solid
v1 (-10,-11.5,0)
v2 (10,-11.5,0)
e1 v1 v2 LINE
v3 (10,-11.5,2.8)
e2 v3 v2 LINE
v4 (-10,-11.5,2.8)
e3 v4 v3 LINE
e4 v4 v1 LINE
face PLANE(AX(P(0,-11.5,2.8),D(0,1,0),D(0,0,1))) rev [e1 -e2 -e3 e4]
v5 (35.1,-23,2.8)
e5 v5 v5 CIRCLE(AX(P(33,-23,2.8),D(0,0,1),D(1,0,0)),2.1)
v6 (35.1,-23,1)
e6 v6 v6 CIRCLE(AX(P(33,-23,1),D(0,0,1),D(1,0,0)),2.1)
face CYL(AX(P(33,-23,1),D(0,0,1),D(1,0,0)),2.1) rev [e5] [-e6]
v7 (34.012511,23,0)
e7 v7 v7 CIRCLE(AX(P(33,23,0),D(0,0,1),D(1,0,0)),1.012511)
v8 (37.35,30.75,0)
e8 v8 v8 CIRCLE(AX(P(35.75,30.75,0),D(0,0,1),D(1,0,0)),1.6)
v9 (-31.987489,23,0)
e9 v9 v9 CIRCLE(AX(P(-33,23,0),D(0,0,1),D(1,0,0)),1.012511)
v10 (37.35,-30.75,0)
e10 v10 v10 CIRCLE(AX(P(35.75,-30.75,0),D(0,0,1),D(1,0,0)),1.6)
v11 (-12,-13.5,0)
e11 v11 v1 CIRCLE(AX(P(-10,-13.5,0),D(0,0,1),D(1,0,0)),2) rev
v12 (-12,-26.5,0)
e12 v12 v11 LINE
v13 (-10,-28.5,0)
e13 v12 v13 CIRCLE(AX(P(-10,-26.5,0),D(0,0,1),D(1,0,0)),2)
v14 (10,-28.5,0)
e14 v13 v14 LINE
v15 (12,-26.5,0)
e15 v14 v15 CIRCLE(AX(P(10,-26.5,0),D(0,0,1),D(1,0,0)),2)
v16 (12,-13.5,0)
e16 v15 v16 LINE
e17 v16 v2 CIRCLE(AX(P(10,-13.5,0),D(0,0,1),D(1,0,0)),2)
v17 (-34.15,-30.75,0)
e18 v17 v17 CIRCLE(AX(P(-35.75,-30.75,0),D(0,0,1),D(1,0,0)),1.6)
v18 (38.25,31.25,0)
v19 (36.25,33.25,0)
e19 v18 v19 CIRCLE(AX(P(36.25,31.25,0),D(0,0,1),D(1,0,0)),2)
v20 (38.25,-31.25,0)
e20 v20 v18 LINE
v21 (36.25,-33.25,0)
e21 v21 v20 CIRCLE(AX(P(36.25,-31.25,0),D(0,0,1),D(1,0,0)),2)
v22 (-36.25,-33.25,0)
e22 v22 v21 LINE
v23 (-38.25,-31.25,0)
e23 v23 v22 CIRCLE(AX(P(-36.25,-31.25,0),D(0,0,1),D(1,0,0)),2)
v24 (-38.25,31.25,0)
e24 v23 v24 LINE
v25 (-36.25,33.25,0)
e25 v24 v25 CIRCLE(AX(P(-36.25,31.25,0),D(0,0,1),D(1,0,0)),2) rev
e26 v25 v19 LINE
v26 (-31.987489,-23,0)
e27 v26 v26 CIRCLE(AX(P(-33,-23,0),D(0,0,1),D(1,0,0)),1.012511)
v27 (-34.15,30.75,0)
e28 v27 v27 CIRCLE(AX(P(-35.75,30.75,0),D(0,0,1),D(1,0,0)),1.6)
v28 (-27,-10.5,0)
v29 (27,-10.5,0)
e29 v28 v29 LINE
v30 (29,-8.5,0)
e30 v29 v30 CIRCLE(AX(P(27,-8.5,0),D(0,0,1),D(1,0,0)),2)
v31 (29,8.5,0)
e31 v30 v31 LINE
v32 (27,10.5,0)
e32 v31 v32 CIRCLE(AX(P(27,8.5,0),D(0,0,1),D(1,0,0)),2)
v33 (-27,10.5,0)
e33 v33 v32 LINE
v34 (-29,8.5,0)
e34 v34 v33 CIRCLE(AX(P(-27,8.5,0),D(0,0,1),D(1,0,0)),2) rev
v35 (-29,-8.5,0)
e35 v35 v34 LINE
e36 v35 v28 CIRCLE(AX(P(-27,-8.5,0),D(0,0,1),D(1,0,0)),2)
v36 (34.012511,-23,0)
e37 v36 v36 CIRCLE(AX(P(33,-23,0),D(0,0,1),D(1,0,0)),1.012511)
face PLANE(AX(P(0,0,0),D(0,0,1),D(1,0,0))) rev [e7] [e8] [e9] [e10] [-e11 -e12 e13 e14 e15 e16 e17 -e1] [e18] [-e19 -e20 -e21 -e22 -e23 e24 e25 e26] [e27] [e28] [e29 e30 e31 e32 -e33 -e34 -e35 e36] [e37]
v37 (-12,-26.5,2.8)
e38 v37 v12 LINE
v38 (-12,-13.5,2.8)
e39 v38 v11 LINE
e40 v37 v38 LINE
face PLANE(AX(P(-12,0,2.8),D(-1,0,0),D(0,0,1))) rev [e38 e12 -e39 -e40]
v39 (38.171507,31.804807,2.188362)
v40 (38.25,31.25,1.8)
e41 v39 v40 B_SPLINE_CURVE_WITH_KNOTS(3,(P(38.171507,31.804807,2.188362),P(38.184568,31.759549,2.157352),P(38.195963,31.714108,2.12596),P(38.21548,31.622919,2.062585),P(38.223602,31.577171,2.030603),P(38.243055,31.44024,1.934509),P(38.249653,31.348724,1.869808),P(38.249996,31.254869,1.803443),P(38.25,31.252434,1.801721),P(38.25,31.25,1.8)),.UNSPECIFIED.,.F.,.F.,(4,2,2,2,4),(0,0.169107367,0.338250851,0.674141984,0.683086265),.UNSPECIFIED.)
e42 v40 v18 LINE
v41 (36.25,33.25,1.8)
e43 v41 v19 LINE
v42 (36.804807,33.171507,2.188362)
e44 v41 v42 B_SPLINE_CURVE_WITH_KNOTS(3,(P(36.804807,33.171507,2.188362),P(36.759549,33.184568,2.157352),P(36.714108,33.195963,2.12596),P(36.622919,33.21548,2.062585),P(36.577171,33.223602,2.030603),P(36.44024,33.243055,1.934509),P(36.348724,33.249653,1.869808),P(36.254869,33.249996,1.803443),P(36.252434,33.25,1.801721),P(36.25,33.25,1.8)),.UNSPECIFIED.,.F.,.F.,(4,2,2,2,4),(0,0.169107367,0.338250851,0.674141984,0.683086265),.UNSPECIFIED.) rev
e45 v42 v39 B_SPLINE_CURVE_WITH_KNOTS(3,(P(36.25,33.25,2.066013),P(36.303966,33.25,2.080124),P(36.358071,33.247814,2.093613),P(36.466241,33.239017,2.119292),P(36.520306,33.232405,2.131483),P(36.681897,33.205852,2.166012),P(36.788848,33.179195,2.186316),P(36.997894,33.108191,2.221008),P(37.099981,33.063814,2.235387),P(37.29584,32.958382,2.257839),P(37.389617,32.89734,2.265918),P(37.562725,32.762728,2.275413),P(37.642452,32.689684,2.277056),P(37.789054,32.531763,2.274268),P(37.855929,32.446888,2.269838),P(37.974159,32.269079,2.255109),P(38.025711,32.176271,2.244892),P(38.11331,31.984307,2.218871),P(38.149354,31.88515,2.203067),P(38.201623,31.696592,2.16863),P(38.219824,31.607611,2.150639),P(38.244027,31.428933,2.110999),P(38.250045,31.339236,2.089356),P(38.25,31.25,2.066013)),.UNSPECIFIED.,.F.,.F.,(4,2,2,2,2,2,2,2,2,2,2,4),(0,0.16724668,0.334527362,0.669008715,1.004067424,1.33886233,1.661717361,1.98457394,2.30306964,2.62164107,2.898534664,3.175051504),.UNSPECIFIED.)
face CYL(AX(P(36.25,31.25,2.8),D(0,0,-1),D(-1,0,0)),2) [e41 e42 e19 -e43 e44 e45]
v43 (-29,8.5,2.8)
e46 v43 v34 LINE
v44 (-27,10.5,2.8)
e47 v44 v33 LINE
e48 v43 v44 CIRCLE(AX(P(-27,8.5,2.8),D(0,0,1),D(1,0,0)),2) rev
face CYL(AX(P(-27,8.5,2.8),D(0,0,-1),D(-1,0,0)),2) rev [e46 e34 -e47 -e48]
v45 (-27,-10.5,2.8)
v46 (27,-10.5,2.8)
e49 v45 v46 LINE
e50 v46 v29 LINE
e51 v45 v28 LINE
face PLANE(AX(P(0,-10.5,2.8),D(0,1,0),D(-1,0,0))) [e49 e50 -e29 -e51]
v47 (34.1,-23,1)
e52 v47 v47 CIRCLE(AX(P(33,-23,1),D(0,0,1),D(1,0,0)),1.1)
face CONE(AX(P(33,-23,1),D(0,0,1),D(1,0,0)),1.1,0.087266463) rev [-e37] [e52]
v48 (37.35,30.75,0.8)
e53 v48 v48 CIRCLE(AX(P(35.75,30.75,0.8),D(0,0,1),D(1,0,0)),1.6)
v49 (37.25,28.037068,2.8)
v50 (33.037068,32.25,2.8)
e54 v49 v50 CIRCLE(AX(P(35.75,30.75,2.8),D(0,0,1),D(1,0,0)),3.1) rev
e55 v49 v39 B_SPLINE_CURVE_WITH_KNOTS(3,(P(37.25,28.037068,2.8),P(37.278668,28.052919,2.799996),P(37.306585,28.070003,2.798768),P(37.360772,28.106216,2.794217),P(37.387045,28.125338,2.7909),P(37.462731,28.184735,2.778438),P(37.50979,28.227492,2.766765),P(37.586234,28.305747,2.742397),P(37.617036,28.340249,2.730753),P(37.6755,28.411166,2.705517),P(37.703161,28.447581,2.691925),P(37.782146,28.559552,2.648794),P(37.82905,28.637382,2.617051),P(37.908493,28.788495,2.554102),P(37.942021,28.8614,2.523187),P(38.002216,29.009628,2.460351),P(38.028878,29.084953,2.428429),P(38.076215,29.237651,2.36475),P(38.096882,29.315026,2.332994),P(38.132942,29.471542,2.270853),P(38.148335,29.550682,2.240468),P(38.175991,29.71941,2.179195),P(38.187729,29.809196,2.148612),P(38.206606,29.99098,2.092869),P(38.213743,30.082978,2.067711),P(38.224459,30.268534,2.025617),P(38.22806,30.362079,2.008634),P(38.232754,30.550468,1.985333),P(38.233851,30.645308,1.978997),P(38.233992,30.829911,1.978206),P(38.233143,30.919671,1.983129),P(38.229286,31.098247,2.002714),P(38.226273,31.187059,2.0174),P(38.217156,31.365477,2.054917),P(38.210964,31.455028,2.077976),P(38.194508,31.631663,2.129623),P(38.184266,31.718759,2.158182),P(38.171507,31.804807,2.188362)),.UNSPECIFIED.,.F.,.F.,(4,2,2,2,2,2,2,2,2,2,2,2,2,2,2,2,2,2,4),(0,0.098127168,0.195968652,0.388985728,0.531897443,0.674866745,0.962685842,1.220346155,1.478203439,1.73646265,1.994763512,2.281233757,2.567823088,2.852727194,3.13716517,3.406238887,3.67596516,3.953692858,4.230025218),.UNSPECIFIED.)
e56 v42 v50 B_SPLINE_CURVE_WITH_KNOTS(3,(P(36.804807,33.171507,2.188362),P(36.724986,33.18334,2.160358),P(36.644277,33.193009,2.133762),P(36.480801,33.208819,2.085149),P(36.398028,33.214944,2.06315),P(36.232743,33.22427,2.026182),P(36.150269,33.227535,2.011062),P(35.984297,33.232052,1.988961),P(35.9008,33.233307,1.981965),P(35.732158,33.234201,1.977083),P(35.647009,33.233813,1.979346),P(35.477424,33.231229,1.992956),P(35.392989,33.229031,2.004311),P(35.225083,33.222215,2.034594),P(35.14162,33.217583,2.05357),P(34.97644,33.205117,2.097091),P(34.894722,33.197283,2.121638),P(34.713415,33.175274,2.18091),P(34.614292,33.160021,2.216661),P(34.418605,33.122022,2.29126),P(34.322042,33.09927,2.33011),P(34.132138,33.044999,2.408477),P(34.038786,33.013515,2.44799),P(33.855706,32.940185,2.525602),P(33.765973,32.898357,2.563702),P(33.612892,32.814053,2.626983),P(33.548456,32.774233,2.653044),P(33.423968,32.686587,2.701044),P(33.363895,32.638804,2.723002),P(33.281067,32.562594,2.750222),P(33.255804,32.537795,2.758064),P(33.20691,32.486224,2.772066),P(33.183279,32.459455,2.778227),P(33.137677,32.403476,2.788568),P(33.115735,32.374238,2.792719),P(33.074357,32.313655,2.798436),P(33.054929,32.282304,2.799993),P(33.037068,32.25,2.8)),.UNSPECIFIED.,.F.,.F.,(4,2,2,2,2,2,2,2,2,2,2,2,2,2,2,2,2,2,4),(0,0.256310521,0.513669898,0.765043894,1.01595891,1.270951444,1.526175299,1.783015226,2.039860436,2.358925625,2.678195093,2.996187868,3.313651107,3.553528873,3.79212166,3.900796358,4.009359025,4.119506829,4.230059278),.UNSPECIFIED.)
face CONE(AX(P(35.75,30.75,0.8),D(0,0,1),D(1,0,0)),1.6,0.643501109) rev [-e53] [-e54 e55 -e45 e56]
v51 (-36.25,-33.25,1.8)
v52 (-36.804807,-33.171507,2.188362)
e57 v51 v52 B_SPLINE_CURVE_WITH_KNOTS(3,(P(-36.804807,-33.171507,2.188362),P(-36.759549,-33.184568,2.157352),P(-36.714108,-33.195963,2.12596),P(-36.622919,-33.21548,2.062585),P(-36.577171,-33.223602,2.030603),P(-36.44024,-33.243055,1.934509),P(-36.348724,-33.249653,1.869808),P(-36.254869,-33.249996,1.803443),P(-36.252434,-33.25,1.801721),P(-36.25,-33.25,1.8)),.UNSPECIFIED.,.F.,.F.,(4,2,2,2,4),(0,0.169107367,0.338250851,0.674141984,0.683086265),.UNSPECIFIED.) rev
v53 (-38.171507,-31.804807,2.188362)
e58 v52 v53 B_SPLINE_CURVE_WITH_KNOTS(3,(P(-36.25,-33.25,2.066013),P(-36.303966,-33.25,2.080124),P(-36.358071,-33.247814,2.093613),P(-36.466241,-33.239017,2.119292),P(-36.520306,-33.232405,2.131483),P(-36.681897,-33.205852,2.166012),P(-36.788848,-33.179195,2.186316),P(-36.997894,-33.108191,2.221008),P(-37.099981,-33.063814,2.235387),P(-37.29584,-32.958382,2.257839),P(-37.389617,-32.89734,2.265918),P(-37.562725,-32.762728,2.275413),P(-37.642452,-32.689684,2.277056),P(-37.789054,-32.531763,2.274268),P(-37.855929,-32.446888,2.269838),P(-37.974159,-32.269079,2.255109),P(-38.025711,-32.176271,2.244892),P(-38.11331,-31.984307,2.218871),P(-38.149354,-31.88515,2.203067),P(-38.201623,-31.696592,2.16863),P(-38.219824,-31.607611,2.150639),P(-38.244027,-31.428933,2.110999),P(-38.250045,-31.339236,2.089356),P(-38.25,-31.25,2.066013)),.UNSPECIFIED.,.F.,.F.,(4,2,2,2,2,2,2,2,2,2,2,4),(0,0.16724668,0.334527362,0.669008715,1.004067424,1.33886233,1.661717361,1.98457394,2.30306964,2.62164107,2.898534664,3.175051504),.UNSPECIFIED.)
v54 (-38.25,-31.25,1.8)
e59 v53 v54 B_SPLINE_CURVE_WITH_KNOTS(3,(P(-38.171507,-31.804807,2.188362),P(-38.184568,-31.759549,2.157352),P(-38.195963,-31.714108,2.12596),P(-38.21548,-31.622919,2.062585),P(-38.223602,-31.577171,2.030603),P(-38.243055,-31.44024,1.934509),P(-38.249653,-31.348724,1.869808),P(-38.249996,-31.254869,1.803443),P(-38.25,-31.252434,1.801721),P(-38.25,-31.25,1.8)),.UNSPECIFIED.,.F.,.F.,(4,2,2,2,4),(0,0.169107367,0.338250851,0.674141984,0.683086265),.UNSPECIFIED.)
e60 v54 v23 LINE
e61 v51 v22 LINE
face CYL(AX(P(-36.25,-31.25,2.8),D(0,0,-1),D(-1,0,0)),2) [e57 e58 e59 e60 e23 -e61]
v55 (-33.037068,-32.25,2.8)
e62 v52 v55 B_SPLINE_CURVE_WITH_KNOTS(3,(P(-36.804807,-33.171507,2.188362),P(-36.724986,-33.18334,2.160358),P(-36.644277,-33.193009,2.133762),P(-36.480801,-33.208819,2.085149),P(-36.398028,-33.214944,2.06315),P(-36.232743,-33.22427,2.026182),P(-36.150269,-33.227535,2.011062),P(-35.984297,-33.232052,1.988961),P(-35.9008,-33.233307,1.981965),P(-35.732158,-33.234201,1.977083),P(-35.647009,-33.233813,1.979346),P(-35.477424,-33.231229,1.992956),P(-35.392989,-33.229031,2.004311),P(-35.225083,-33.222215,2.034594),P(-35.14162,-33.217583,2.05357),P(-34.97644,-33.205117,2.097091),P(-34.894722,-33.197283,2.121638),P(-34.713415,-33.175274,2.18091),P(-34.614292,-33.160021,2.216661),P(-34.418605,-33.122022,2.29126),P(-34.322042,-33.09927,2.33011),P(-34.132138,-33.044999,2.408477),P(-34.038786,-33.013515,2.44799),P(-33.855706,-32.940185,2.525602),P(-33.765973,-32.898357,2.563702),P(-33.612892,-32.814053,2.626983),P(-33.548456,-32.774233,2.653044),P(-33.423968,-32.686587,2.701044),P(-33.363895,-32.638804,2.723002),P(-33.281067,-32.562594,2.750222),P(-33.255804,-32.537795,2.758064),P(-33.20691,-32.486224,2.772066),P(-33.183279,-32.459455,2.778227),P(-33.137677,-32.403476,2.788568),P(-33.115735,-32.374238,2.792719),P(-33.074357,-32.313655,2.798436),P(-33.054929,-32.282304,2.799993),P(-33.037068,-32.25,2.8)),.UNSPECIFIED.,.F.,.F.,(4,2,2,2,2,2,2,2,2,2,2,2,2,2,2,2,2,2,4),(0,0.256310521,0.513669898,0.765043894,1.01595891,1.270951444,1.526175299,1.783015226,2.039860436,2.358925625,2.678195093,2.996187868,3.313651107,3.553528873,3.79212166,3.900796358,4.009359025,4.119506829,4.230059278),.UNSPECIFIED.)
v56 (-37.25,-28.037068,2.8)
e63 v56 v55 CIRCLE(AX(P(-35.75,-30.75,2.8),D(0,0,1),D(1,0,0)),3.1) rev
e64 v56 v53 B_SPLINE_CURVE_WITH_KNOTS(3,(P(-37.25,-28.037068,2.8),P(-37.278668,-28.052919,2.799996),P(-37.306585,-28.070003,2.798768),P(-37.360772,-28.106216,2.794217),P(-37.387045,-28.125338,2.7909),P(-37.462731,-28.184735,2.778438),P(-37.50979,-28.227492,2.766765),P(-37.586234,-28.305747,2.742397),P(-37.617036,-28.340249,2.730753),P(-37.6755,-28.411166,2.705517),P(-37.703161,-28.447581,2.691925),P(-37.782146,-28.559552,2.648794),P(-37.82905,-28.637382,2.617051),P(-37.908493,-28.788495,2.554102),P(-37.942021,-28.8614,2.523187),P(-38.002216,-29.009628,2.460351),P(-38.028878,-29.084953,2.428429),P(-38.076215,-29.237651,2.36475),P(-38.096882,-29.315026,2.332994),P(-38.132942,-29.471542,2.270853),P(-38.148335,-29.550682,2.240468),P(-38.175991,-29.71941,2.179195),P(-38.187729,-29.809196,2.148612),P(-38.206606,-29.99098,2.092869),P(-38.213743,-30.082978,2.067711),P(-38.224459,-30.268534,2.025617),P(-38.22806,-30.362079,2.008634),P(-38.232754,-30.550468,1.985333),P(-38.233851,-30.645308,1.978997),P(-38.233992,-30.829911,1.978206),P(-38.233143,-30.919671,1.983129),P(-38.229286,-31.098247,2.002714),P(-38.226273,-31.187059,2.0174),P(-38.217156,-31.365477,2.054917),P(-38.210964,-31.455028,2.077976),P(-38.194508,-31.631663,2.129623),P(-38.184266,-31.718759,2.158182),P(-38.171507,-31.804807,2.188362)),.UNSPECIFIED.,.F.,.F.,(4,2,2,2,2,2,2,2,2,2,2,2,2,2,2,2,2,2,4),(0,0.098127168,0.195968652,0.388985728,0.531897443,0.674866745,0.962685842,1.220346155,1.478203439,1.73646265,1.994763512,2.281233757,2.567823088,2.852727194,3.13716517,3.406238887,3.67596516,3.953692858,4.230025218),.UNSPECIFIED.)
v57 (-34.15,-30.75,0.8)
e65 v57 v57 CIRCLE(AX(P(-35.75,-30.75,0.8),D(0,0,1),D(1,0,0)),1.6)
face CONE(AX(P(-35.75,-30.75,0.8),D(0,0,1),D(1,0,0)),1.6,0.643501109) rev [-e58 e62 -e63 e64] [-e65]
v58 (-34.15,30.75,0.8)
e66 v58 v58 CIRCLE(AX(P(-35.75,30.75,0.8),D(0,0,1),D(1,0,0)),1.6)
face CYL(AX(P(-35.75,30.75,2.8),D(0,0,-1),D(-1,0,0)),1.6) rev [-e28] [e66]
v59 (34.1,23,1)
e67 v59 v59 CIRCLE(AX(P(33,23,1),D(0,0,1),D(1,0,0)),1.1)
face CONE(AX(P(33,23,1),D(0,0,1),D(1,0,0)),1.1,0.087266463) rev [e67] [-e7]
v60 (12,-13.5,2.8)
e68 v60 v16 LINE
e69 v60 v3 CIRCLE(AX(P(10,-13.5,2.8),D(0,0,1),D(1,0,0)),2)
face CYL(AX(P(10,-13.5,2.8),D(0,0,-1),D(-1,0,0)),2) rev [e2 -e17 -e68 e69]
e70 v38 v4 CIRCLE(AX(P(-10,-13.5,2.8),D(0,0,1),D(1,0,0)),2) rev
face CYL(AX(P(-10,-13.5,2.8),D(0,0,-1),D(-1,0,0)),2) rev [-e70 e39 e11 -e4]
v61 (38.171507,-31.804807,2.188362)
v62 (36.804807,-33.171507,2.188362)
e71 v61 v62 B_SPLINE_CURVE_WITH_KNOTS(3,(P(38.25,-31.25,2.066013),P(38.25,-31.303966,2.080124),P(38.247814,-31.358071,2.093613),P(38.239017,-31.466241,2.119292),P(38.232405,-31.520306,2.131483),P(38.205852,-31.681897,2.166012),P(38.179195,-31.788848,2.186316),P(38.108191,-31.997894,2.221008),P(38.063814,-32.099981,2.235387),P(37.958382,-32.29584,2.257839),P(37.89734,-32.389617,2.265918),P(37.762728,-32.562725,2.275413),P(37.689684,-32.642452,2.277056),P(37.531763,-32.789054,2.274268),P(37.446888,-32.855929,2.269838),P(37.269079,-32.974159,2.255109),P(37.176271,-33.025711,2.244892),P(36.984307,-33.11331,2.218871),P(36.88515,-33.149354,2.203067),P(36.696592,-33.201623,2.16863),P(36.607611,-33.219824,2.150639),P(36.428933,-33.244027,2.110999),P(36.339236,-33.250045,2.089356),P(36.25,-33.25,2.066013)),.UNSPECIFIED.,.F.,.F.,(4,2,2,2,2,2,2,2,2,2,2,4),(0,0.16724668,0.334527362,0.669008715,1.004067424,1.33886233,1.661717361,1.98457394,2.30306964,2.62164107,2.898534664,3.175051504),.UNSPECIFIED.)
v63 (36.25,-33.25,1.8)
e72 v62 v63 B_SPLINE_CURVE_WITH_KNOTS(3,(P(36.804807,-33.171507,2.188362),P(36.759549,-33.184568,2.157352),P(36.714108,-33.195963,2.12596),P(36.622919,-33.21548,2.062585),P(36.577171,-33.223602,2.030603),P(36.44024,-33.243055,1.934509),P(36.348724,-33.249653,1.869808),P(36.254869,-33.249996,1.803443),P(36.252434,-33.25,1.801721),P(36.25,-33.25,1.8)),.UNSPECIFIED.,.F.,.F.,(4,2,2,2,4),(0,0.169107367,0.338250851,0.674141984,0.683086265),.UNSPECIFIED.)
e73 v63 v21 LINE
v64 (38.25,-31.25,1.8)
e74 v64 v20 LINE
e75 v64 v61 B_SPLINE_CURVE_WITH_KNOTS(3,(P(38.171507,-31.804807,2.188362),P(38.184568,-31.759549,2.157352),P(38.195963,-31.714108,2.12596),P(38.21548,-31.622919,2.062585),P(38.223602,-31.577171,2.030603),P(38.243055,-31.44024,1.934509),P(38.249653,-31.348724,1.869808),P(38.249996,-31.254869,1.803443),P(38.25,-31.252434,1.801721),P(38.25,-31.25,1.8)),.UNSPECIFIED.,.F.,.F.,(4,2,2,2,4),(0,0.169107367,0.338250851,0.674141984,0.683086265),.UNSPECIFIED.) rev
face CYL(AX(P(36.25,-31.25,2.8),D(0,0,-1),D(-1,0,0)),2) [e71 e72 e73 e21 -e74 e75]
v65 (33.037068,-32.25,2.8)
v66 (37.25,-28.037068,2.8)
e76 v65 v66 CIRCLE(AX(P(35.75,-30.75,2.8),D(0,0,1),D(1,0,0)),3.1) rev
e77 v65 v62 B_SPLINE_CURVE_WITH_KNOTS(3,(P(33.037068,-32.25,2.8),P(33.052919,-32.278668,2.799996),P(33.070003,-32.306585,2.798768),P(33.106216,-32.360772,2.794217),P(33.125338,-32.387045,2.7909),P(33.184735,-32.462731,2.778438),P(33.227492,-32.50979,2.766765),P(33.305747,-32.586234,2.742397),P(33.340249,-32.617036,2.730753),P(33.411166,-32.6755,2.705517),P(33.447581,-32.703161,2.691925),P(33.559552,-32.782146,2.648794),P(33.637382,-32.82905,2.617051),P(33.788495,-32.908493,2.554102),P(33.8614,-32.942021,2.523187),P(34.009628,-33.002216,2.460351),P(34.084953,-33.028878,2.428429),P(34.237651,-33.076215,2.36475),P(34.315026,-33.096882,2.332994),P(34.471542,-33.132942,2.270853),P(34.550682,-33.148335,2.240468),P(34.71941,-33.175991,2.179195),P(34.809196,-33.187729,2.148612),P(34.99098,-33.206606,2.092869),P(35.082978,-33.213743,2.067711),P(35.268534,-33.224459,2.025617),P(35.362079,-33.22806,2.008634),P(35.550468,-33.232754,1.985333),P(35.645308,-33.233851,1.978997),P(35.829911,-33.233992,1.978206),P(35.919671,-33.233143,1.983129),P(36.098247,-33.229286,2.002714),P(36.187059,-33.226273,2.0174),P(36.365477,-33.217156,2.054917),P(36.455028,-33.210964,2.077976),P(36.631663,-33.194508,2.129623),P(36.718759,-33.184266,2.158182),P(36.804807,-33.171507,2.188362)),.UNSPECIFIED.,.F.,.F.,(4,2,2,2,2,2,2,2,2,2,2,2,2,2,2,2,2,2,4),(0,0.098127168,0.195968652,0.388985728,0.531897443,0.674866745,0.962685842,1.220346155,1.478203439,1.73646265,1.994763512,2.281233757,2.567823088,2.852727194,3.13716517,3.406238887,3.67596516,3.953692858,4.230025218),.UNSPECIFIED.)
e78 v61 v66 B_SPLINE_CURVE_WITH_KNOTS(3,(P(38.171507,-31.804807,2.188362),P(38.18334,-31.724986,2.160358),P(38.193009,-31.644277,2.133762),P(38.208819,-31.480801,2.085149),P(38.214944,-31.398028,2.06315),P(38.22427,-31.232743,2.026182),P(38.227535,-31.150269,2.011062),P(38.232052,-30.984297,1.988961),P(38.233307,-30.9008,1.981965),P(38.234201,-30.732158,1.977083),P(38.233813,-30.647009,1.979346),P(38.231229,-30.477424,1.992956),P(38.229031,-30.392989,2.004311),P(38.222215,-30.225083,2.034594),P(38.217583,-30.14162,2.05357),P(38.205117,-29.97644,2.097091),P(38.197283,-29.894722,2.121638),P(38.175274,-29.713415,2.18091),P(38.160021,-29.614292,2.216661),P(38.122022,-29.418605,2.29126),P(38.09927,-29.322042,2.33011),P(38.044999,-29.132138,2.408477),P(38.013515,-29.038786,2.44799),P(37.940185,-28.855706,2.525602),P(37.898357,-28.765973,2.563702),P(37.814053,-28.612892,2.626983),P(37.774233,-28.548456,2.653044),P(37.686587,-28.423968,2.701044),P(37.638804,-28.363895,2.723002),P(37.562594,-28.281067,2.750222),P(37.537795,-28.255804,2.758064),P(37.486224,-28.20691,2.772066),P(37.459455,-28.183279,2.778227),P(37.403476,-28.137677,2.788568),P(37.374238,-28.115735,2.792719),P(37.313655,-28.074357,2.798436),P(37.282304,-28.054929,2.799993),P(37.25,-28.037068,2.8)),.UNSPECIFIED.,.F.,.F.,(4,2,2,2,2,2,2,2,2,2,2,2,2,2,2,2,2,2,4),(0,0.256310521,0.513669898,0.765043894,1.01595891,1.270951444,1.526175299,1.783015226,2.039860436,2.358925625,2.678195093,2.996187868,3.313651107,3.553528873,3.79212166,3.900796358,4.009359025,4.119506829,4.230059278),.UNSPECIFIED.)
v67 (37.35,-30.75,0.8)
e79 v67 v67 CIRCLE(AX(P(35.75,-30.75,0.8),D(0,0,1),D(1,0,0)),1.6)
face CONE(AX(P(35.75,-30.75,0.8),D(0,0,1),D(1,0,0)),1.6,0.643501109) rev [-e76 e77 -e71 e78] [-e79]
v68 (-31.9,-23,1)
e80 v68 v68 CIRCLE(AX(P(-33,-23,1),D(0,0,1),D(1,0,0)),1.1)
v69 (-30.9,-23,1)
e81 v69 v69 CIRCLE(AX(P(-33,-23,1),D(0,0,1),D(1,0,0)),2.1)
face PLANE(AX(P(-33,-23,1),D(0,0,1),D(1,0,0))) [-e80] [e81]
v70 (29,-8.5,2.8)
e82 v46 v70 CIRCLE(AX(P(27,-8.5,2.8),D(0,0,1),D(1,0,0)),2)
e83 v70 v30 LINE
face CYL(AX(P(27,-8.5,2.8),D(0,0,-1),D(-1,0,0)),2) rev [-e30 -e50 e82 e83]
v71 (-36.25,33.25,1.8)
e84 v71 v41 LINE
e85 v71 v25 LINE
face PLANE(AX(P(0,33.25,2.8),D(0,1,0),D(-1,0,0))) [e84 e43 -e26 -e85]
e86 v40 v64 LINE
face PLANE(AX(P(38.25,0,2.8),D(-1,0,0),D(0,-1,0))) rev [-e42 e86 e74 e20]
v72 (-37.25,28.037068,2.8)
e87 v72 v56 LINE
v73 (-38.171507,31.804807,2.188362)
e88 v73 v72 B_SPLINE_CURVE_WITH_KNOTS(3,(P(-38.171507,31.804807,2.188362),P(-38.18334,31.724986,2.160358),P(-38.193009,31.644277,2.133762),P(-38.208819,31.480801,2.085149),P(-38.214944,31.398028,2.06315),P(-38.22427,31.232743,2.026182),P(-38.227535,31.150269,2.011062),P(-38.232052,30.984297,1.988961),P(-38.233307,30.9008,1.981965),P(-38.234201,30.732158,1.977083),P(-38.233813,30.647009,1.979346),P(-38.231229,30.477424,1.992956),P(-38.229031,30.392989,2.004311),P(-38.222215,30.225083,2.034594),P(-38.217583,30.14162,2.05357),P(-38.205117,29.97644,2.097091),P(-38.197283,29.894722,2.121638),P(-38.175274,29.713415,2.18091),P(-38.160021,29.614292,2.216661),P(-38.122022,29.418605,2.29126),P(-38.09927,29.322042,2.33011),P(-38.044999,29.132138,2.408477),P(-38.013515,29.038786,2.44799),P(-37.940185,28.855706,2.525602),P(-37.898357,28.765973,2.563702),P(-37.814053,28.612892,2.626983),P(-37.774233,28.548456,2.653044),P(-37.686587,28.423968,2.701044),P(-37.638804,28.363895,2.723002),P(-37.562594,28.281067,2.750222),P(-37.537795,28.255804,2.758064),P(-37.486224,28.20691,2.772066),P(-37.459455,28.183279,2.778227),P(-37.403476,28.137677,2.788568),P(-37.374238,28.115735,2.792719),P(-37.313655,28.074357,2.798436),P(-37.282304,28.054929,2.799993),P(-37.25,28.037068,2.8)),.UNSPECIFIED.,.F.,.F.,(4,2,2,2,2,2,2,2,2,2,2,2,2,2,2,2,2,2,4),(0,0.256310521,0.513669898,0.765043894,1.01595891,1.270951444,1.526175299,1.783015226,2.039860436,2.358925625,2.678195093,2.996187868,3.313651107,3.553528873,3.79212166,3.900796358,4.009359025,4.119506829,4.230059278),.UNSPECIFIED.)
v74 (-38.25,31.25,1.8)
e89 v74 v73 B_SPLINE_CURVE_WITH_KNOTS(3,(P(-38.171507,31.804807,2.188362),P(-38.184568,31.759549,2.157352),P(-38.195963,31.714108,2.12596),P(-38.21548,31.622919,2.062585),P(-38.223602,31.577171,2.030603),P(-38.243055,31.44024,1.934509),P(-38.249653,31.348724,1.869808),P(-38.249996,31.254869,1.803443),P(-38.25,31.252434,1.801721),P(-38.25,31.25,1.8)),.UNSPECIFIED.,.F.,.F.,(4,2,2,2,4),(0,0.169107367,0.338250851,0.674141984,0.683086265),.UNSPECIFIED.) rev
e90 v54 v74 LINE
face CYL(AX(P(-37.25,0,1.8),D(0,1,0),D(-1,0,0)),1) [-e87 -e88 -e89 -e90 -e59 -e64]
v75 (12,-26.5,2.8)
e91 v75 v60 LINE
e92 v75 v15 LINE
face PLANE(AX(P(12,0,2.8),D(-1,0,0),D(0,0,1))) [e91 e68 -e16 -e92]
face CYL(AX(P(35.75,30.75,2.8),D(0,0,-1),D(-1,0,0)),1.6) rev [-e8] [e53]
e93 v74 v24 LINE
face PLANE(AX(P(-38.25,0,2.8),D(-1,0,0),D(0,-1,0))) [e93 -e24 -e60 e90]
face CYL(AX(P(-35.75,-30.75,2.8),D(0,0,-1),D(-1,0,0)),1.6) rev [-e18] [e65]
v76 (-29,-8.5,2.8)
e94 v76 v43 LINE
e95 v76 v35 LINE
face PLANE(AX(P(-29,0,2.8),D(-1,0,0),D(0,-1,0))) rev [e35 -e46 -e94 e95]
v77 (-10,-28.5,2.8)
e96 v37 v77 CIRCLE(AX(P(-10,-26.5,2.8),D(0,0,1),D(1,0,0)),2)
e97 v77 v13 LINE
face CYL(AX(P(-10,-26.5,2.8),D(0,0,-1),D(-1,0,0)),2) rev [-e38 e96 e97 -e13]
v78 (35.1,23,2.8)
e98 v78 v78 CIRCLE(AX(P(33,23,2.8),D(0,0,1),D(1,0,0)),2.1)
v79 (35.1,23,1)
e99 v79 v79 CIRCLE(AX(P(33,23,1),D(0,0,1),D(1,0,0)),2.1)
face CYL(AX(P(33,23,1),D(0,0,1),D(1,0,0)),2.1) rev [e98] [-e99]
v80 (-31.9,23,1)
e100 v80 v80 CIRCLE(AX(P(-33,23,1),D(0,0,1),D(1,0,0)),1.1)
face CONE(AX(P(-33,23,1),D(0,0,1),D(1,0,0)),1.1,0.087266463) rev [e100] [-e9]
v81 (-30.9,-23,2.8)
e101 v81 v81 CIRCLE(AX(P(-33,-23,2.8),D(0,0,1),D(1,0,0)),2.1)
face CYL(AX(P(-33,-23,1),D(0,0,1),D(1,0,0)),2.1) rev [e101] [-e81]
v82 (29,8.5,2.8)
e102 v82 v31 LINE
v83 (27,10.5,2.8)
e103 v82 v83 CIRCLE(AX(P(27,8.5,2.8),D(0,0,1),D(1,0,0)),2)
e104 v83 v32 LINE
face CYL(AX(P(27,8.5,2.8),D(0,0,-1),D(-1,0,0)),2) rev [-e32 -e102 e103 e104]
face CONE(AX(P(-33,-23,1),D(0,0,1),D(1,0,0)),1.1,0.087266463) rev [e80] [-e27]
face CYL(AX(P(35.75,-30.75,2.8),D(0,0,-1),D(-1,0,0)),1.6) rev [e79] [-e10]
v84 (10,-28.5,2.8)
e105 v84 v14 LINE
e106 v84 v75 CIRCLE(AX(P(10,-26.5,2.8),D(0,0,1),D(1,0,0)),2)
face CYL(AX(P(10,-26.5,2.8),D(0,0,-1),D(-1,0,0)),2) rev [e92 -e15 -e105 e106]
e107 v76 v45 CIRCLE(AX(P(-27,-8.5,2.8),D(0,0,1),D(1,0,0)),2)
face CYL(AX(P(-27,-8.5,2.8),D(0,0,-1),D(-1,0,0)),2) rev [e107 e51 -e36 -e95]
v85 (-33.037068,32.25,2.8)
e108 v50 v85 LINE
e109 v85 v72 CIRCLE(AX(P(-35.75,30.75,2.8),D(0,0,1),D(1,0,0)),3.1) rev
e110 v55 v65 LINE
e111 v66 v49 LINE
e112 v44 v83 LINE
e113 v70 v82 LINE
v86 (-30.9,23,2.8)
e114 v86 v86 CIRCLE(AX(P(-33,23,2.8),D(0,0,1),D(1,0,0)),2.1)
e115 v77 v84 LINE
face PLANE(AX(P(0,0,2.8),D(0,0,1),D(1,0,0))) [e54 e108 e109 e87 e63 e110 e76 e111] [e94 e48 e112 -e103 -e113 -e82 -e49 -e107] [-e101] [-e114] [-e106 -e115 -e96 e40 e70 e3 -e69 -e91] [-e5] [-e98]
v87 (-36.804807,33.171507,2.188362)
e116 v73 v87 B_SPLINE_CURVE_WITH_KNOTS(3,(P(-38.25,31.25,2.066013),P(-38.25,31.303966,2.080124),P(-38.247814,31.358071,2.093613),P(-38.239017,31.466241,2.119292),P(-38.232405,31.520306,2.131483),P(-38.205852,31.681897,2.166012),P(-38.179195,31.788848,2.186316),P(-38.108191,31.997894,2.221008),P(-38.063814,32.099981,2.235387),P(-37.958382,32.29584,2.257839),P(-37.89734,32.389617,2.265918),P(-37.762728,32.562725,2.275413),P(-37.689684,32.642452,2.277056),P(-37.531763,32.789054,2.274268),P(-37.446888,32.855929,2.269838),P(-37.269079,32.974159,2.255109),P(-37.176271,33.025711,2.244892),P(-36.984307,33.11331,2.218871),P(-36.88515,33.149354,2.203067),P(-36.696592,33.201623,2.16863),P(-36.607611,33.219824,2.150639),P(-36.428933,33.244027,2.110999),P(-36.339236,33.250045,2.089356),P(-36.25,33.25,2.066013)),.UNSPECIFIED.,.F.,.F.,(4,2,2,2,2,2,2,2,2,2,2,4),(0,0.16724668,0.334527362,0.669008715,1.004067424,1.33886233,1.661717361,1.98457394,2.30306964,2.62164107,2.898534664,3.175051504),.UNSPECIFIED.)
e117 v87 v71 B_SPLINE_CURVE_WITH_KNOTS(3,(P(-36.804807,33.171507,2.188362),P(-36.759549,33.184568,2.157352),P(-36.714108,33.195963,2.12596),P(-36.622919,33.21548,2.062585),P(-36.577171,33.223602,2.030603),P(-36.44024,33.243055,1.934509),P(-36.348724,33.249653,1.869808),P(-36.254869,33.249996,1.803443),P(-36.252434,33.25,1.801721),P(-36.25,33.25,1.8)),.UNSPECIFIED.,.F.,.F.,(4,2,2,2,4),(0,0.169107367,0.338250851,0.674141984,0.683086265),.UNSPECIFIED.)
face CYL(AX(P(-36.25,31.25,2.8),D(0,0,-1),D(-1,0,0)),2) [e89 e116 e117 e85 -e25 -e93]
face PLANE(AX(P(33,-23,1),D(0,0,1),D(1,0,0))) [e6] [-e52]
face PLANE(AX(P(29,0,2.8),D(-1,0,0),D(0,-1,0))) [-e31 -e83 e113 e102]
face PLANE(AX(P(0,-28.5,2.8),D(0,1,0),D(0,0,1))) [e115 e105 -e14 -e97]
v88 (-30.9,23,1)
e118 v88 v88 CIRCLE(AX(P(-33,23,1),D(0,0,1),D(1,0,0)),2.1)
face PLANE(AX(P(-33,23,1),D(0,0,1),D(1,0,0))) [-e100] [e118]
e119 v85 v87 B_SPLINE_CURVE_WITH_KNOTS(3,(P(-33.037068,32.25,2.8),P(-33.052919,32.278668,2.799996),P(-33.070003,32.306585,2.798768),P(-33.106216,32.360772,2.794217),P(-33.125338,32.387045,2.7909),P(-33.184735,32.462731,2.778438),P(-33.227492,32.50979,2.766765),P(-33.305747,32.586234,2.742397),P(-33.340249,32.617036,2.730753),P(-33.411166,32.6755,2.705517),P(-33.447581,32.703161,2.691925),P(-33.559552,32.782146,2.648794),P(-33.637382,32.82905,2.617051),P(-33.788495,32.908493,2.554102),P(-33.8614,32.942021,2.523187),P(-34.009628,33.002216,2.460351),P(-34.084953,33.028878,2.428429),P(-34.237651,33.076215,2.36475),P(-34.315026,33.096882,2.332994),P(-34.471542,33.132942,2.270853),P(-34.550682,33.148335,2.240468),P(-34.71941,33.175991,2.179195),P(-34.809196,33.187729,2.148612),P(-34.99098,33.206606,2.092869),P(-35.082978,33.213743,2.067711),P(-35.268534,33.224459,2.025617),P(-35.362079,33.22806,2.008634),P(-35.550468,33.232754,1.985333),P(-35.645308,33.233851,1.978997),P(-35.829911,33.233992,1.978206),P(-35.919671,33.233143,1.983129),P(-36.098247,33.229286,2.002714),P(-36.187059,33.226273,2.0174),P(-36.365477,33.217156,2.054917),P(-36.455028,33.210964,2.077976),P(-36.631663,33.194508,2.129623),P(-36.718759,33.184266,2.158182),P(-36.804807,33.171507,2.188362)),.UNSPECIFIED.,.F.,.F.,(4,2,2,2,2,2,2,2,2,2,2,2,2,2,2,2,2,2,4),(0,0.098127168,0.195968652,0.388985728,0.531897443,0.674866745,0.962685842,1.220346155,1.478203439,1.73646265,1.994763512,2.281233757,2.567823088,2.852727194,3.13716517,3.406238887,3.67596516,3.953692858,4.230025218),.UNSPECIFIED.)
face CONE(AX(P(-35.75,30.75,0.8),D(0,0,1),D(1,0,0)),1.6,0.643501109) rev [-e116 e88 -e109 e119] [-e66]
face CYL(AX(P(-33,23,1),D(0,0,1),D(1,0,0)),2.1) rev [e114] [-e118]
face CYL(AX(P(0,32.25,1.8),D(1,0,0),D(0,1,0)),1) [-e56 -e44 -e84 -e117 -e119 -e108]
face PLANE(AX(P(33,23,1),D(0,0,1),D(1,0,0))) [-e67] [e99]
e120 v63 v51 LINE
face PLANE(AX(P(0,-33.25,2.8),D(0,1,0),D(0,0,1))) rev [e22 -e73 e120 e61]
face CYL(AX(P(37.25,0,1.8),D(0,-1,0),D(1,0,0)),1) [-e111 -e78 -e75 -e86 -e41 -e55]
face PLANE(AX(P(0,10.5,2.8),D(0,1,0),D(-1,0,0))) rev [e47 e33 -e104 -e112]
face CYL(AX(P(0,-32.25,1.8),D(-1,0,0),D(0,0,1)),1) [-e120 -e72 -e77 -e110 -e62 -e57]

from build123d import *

# Parameters (mm, degrees)
SKETCH1_R           = 1.6
BOSS_EXTRUDE1_DEPTH = 2.8
CUT_EXTRUDE2_START  = 2.8
SKETCH1_6_R         = 2.1
CUT_EXTRUDE2_DEPTH  = 1.8
CHAMFER1_SIZE       = 1.5
CHAMFER1_SIZE_2     = 2
FILLET1_START       = -33.224011807
FILLET1_DEPTH       = 66.448023614
FILLET1_START_2     = -38.224011807
FILLET1_2_DEPTH     = 76.3236742


with BuildPart() as part:
    # Sketch1 → Boss-Extrude1 (new body)
    with BuildSketch(Plane(origin=(0, 0, 0), x_dir=(0, 1, 0), z_dir=(0, 0, 1))):
        with BuildLine():
            Line((31.25, 38.25), (-31.25, 38.25))
            ThreePointArc((-31.25, 38.25), (-32.664213562, 37.664213562), (-33.25, 36.25))
            Line((-33.25, 36.25), (-33.25, -36.25))
            ThreePointArc((-33.25, -36.25), (-32.664213562, -37.664213562), (-31.25, -38.25))
            Line((-31.25, -38.25), (31.25, -38.25))
            ThreePointArc((31.25, -38.25), (32.664213562, -37.664213562), (33.25, -36.25))
            Line((33.25, -36.25), (33.25, 36.25))
            ThreePointArc((33.25, 36.25), (32.664213562, 37.664213562), (31.25, 38.25))
        make_face()
        with Locations(Location((-30.75, -35.75, 0), (0, 0, 270))):
            Circle(SKETCH1_R, mode=Mode.SUBTRACT)
        with Locations(Location((30.75, -35.75, 0), (0, 0, 270))):
            Circle(SKETCH1_R, mode=Mode.SUBTRACT)
        with BuildLine():
            ThreePointArc((-28.5, 10), (-27.914213562, 11.414213562), (-26.5, 12))
            Line((-26.5, 12), (-13.5, 12))
            ThreePointArc((-13.5, 12), (-12.085786438, 11.414213562), (-11.5, 10))
            Line((-11.5, 10), (-11.5, -10))
            ThreePointArc((-11.5, -10), (-12.085786438, -11.414213562), (-13.5, -12))
            Line((-13.5, -12), (-26.5, -12))
            ThreePointArc((-26.5, -12), (-27.914213562, -11.414213562), (-28.5, -10))
            Line((-28.5, -10), (-28.5, 10))
        make_face(mode=Mode.SUBTRACT)
        with Locations(Location((-30.75, 35.75, 0), (0, 0, 270))):
            Circle(SKETCH1_R, mode=Mode.SUBTRACT)
        with BuildLine():
            Line((-10.5, -27), (-10.5, 27))
            ThreePointArc((-10.5, 27), (-9.914213562, 28.414213562), (-8.5, 29))
            Line((-8.5, 29), (8.5, 29))
            ThreePointArc((8.5, 29), (9.914213562, 28.414213562), (10.5, 27))
            Line((10.5, 27), (10.5, -27))
            ThreePointArc((10.5, -27), (9.914213562, -28.414213562), (8.5, -29))
            Line((8.5, -29), (-8.5, -29))
            ThreePointArc((-8.5, -29), (-9.914213562, -28.414213562), (-10.5, -27))
        make_face(mode=Mode.SUBTRACT)
        with Locations(Location((30.75, 35.75, 0), (0, 0, 270))):
            Circle(SKETCH1_R, mode=Mode.SUBTRACT)
    extrude(amount=BOSS_EXTRUDE1_DEPTH)

    # Sketch1<6> → Cut-Extrude2 (cut)
    with BuildSketch(Plane(origin=(0, 0, 0), x_dir=(0, 1, 0), z_dir=(0, 0, 1)).offset(CUT_EXTRUDE2_START)):
        with Locations(Location((-23, 33, 0), (0, 0, 270))):
            Circle(SKETCH1_6_R)
        with Locations(Location((23, 33, 0), (0, 0, 270))):
            Circle(SKETCH1_6_R)
        with Locations(Location((23, -33, 0), (0, 0, 270))):
            Circle(SKETCH1_6_R)
        with Locations(Location((-23, -33, 0), (0, 0, 270))):
            Circle(SKETCH1_6_R)
    extrude(amount=-CUT_EXTRUDE2_DEPTH, mode=Mode.SUBTRACT)

    # Cut-Extrude1 cone 1 section (through the dimple's axis) → Cut-Extrude1 (revolve, cut)
    with BuildSketch(Plane(origin=(33, -23, 1), x_dir=(0, -1, 0), z_dir=(1, 0, 0))):
        Polygon((0, 0), (1.1, 0), (0, 12.573057533), align=None)
    revolve(axis=Axis((33, -23, 1), (0, 0, -1)), mode=Mode.SUBTRACT)

    # Cut-Extrude1 cone 2 section (through the dimple's axis) → Cut-Extrude1 cone 2 (revolve, cut)
    with BuildSketch(Plane(origin=(-33, -23, 1), x_dir=(0, -1, 0), z_dir=(1, 0, 0))):
        Polygon((0, 0), (1.1, 0), (0, 12.573057533), align=None)
    revolve(axis=Axis((-33, -23, 1), (0, 0, -1)), mode=Mode.SUBTRACT)

    # Cut-Extrude1 cone 3 section (through the dimple's axis) → Cut-Extrude1 cone 3 (revolve, cut)
    with BuildSketch(Plane(origin=(-33, 23, 1), x_dir=(0, -1, 0), z_dir=(1, 0, 0))):
        Polygon((0, 0), (1.1, 0), (0, 12.573057533), align=None)
    revolve(axis=Axis((-33, 23, 1), (0, 0, -1)), mode=Mode.SUBTRACT)

    # Cut-Extrude1 cone 4 section (through the dimple's axis) → Cut-Extrude1 cone 4 (revolve, cut)
    with BuildSketch(Plane(origin=(33, 23, 1), x_dir=(0, -1, 0), z_dir=(1, 0, 0))):
        Polygon((0, 0), (1.1, 0), (0, 12.573057533), align=None)
    revolve(axis=Axis((33, 23, 1), (0, 0, -1)), mode=Mode.SUBTRACT)

    # Chamfer1
    # the kernel refuses this chamfer: 2, 1.5 mm, written as the material it takes off along each edge
    with BuildSketch(Plane(origin=(-35.75, -30.75, 2.8), x_dir=(1, 0, 0), z_dir=(0, -1, 0))) as chamfer1_piece_1:
        Polygon((1.6 + CHAMFER1_SIZE, 0), (1.6, -CHAMFER1_SIZE_2), (1.6, 0), align=None)
    revolve(axis=Axis((-35.75, -30.75, 2.8), (0, 0, 1)), mode=Mode.SUBTRACT)
    with BuildSketch(Plane(origin=(35.75, -30.75, 2.8), x_dir=(1, 0, 0), z_dir=(0, -1, 0))) as chamfer1_piece_2:
        Polygon((1.6 + CHAMFER1_SIZE, 0), (1.6, -CHAMFER1_SIZE_2), (1.6, 0), align=None)
    revolve(axis=Axis((35.75, -30.75, 2.8), (0, 0, 1)), mode=Mode.SUBTRACT)
    with BuildSketch(Plane(origin=(35.75, 30.75, 2.8), x_dir=(1, 0, 0), z_dir=(0, -1, 0))) as chamfer1_piece_3:
        Polygon((1.6 + CHAMFER1_SIZE, 0), (1.6, -CHAMFER1_SIZE_2), (1.6, 0), align=None)
    revolve(axis=Axis((35.75, 30.75, 2.8), (0, 0, 1)), mode=Mode.SUBTRACT)
    with BuildSketch(Plane(origin=(-35.75, 30.75, 2.8), x_dir=(1, 0, 0), z_dir=(0, -1, 0))) as chamfer1_piece_4:
        Polygon((1.6 + CHAMFER1_SIZE, 0), (1.6, -CHAMFER1_SIZE_2), (1.6, 0), align=None)
    revolve(axis=Axis((-35.75, 30.75, 2.8), (0, 0, 1)), mode=Mode.SUBTRACT)

    # Fillet1: read off the stored shape, not the designer's step
    # Fillet1 outline → Fillet1 (cut)
    with BuildSketch(Plane(origin=(0, 0, 0), x_dir=(1, 0, 0), z_dir=(0, 1, 0)).offset(FILLET1_START)):
        with BuildLine():
            ThreePointArc((38.25, -1.8), (37.957106781, -2.507106781), (37.25, -2.8))
            Line((37.25, -2.8), (38.25, -2.8))
            Line((38.25, -2.8), (38.25, -1.8))
        make_face()
        with BuildLine():
            ThreePointArc((-37.25, -2.8), (-37.957106781, -2.507106781), (-38.25, -1.8))
            Line((-38.25, -1.8), (-38.25, -2.8))
            Line((-38.25, -2.8), (-37.25, -2.8))
        make_face()
    extrude(amount=FILLET1_DEPTH, mode=Mode.SUBTRACT)

    # Fillet1 2 outline → Fillet1 2 (cut)
    with BuildSketch(Plane.YZ.offset(FILLET1_START_2)):
        with BuildLine():
            Line((-33.25, 2.8), (-33.25, 1.8))
            ThreePointArc((-33.25, 1.8), (-32.957106781, 2.507106781), (-32.25, 2.8))
            Line((-32.25, 2.8), (-33.25, 2.8))
        make_face()
        with BuildLine():
            Line((33.25, 2.8), (32.25, 2.8))
            ThreePointArc((32.25, 2.8), (32.957106781, 2.507106781), (33.25, 1.8))
            Line((33.25, 1.8), (33.25, 2.8))
        make_face()
    extrude(amount=FILLET1_2_DEPTH, mode=Mode.SUBTRACT)


solid = part.part
